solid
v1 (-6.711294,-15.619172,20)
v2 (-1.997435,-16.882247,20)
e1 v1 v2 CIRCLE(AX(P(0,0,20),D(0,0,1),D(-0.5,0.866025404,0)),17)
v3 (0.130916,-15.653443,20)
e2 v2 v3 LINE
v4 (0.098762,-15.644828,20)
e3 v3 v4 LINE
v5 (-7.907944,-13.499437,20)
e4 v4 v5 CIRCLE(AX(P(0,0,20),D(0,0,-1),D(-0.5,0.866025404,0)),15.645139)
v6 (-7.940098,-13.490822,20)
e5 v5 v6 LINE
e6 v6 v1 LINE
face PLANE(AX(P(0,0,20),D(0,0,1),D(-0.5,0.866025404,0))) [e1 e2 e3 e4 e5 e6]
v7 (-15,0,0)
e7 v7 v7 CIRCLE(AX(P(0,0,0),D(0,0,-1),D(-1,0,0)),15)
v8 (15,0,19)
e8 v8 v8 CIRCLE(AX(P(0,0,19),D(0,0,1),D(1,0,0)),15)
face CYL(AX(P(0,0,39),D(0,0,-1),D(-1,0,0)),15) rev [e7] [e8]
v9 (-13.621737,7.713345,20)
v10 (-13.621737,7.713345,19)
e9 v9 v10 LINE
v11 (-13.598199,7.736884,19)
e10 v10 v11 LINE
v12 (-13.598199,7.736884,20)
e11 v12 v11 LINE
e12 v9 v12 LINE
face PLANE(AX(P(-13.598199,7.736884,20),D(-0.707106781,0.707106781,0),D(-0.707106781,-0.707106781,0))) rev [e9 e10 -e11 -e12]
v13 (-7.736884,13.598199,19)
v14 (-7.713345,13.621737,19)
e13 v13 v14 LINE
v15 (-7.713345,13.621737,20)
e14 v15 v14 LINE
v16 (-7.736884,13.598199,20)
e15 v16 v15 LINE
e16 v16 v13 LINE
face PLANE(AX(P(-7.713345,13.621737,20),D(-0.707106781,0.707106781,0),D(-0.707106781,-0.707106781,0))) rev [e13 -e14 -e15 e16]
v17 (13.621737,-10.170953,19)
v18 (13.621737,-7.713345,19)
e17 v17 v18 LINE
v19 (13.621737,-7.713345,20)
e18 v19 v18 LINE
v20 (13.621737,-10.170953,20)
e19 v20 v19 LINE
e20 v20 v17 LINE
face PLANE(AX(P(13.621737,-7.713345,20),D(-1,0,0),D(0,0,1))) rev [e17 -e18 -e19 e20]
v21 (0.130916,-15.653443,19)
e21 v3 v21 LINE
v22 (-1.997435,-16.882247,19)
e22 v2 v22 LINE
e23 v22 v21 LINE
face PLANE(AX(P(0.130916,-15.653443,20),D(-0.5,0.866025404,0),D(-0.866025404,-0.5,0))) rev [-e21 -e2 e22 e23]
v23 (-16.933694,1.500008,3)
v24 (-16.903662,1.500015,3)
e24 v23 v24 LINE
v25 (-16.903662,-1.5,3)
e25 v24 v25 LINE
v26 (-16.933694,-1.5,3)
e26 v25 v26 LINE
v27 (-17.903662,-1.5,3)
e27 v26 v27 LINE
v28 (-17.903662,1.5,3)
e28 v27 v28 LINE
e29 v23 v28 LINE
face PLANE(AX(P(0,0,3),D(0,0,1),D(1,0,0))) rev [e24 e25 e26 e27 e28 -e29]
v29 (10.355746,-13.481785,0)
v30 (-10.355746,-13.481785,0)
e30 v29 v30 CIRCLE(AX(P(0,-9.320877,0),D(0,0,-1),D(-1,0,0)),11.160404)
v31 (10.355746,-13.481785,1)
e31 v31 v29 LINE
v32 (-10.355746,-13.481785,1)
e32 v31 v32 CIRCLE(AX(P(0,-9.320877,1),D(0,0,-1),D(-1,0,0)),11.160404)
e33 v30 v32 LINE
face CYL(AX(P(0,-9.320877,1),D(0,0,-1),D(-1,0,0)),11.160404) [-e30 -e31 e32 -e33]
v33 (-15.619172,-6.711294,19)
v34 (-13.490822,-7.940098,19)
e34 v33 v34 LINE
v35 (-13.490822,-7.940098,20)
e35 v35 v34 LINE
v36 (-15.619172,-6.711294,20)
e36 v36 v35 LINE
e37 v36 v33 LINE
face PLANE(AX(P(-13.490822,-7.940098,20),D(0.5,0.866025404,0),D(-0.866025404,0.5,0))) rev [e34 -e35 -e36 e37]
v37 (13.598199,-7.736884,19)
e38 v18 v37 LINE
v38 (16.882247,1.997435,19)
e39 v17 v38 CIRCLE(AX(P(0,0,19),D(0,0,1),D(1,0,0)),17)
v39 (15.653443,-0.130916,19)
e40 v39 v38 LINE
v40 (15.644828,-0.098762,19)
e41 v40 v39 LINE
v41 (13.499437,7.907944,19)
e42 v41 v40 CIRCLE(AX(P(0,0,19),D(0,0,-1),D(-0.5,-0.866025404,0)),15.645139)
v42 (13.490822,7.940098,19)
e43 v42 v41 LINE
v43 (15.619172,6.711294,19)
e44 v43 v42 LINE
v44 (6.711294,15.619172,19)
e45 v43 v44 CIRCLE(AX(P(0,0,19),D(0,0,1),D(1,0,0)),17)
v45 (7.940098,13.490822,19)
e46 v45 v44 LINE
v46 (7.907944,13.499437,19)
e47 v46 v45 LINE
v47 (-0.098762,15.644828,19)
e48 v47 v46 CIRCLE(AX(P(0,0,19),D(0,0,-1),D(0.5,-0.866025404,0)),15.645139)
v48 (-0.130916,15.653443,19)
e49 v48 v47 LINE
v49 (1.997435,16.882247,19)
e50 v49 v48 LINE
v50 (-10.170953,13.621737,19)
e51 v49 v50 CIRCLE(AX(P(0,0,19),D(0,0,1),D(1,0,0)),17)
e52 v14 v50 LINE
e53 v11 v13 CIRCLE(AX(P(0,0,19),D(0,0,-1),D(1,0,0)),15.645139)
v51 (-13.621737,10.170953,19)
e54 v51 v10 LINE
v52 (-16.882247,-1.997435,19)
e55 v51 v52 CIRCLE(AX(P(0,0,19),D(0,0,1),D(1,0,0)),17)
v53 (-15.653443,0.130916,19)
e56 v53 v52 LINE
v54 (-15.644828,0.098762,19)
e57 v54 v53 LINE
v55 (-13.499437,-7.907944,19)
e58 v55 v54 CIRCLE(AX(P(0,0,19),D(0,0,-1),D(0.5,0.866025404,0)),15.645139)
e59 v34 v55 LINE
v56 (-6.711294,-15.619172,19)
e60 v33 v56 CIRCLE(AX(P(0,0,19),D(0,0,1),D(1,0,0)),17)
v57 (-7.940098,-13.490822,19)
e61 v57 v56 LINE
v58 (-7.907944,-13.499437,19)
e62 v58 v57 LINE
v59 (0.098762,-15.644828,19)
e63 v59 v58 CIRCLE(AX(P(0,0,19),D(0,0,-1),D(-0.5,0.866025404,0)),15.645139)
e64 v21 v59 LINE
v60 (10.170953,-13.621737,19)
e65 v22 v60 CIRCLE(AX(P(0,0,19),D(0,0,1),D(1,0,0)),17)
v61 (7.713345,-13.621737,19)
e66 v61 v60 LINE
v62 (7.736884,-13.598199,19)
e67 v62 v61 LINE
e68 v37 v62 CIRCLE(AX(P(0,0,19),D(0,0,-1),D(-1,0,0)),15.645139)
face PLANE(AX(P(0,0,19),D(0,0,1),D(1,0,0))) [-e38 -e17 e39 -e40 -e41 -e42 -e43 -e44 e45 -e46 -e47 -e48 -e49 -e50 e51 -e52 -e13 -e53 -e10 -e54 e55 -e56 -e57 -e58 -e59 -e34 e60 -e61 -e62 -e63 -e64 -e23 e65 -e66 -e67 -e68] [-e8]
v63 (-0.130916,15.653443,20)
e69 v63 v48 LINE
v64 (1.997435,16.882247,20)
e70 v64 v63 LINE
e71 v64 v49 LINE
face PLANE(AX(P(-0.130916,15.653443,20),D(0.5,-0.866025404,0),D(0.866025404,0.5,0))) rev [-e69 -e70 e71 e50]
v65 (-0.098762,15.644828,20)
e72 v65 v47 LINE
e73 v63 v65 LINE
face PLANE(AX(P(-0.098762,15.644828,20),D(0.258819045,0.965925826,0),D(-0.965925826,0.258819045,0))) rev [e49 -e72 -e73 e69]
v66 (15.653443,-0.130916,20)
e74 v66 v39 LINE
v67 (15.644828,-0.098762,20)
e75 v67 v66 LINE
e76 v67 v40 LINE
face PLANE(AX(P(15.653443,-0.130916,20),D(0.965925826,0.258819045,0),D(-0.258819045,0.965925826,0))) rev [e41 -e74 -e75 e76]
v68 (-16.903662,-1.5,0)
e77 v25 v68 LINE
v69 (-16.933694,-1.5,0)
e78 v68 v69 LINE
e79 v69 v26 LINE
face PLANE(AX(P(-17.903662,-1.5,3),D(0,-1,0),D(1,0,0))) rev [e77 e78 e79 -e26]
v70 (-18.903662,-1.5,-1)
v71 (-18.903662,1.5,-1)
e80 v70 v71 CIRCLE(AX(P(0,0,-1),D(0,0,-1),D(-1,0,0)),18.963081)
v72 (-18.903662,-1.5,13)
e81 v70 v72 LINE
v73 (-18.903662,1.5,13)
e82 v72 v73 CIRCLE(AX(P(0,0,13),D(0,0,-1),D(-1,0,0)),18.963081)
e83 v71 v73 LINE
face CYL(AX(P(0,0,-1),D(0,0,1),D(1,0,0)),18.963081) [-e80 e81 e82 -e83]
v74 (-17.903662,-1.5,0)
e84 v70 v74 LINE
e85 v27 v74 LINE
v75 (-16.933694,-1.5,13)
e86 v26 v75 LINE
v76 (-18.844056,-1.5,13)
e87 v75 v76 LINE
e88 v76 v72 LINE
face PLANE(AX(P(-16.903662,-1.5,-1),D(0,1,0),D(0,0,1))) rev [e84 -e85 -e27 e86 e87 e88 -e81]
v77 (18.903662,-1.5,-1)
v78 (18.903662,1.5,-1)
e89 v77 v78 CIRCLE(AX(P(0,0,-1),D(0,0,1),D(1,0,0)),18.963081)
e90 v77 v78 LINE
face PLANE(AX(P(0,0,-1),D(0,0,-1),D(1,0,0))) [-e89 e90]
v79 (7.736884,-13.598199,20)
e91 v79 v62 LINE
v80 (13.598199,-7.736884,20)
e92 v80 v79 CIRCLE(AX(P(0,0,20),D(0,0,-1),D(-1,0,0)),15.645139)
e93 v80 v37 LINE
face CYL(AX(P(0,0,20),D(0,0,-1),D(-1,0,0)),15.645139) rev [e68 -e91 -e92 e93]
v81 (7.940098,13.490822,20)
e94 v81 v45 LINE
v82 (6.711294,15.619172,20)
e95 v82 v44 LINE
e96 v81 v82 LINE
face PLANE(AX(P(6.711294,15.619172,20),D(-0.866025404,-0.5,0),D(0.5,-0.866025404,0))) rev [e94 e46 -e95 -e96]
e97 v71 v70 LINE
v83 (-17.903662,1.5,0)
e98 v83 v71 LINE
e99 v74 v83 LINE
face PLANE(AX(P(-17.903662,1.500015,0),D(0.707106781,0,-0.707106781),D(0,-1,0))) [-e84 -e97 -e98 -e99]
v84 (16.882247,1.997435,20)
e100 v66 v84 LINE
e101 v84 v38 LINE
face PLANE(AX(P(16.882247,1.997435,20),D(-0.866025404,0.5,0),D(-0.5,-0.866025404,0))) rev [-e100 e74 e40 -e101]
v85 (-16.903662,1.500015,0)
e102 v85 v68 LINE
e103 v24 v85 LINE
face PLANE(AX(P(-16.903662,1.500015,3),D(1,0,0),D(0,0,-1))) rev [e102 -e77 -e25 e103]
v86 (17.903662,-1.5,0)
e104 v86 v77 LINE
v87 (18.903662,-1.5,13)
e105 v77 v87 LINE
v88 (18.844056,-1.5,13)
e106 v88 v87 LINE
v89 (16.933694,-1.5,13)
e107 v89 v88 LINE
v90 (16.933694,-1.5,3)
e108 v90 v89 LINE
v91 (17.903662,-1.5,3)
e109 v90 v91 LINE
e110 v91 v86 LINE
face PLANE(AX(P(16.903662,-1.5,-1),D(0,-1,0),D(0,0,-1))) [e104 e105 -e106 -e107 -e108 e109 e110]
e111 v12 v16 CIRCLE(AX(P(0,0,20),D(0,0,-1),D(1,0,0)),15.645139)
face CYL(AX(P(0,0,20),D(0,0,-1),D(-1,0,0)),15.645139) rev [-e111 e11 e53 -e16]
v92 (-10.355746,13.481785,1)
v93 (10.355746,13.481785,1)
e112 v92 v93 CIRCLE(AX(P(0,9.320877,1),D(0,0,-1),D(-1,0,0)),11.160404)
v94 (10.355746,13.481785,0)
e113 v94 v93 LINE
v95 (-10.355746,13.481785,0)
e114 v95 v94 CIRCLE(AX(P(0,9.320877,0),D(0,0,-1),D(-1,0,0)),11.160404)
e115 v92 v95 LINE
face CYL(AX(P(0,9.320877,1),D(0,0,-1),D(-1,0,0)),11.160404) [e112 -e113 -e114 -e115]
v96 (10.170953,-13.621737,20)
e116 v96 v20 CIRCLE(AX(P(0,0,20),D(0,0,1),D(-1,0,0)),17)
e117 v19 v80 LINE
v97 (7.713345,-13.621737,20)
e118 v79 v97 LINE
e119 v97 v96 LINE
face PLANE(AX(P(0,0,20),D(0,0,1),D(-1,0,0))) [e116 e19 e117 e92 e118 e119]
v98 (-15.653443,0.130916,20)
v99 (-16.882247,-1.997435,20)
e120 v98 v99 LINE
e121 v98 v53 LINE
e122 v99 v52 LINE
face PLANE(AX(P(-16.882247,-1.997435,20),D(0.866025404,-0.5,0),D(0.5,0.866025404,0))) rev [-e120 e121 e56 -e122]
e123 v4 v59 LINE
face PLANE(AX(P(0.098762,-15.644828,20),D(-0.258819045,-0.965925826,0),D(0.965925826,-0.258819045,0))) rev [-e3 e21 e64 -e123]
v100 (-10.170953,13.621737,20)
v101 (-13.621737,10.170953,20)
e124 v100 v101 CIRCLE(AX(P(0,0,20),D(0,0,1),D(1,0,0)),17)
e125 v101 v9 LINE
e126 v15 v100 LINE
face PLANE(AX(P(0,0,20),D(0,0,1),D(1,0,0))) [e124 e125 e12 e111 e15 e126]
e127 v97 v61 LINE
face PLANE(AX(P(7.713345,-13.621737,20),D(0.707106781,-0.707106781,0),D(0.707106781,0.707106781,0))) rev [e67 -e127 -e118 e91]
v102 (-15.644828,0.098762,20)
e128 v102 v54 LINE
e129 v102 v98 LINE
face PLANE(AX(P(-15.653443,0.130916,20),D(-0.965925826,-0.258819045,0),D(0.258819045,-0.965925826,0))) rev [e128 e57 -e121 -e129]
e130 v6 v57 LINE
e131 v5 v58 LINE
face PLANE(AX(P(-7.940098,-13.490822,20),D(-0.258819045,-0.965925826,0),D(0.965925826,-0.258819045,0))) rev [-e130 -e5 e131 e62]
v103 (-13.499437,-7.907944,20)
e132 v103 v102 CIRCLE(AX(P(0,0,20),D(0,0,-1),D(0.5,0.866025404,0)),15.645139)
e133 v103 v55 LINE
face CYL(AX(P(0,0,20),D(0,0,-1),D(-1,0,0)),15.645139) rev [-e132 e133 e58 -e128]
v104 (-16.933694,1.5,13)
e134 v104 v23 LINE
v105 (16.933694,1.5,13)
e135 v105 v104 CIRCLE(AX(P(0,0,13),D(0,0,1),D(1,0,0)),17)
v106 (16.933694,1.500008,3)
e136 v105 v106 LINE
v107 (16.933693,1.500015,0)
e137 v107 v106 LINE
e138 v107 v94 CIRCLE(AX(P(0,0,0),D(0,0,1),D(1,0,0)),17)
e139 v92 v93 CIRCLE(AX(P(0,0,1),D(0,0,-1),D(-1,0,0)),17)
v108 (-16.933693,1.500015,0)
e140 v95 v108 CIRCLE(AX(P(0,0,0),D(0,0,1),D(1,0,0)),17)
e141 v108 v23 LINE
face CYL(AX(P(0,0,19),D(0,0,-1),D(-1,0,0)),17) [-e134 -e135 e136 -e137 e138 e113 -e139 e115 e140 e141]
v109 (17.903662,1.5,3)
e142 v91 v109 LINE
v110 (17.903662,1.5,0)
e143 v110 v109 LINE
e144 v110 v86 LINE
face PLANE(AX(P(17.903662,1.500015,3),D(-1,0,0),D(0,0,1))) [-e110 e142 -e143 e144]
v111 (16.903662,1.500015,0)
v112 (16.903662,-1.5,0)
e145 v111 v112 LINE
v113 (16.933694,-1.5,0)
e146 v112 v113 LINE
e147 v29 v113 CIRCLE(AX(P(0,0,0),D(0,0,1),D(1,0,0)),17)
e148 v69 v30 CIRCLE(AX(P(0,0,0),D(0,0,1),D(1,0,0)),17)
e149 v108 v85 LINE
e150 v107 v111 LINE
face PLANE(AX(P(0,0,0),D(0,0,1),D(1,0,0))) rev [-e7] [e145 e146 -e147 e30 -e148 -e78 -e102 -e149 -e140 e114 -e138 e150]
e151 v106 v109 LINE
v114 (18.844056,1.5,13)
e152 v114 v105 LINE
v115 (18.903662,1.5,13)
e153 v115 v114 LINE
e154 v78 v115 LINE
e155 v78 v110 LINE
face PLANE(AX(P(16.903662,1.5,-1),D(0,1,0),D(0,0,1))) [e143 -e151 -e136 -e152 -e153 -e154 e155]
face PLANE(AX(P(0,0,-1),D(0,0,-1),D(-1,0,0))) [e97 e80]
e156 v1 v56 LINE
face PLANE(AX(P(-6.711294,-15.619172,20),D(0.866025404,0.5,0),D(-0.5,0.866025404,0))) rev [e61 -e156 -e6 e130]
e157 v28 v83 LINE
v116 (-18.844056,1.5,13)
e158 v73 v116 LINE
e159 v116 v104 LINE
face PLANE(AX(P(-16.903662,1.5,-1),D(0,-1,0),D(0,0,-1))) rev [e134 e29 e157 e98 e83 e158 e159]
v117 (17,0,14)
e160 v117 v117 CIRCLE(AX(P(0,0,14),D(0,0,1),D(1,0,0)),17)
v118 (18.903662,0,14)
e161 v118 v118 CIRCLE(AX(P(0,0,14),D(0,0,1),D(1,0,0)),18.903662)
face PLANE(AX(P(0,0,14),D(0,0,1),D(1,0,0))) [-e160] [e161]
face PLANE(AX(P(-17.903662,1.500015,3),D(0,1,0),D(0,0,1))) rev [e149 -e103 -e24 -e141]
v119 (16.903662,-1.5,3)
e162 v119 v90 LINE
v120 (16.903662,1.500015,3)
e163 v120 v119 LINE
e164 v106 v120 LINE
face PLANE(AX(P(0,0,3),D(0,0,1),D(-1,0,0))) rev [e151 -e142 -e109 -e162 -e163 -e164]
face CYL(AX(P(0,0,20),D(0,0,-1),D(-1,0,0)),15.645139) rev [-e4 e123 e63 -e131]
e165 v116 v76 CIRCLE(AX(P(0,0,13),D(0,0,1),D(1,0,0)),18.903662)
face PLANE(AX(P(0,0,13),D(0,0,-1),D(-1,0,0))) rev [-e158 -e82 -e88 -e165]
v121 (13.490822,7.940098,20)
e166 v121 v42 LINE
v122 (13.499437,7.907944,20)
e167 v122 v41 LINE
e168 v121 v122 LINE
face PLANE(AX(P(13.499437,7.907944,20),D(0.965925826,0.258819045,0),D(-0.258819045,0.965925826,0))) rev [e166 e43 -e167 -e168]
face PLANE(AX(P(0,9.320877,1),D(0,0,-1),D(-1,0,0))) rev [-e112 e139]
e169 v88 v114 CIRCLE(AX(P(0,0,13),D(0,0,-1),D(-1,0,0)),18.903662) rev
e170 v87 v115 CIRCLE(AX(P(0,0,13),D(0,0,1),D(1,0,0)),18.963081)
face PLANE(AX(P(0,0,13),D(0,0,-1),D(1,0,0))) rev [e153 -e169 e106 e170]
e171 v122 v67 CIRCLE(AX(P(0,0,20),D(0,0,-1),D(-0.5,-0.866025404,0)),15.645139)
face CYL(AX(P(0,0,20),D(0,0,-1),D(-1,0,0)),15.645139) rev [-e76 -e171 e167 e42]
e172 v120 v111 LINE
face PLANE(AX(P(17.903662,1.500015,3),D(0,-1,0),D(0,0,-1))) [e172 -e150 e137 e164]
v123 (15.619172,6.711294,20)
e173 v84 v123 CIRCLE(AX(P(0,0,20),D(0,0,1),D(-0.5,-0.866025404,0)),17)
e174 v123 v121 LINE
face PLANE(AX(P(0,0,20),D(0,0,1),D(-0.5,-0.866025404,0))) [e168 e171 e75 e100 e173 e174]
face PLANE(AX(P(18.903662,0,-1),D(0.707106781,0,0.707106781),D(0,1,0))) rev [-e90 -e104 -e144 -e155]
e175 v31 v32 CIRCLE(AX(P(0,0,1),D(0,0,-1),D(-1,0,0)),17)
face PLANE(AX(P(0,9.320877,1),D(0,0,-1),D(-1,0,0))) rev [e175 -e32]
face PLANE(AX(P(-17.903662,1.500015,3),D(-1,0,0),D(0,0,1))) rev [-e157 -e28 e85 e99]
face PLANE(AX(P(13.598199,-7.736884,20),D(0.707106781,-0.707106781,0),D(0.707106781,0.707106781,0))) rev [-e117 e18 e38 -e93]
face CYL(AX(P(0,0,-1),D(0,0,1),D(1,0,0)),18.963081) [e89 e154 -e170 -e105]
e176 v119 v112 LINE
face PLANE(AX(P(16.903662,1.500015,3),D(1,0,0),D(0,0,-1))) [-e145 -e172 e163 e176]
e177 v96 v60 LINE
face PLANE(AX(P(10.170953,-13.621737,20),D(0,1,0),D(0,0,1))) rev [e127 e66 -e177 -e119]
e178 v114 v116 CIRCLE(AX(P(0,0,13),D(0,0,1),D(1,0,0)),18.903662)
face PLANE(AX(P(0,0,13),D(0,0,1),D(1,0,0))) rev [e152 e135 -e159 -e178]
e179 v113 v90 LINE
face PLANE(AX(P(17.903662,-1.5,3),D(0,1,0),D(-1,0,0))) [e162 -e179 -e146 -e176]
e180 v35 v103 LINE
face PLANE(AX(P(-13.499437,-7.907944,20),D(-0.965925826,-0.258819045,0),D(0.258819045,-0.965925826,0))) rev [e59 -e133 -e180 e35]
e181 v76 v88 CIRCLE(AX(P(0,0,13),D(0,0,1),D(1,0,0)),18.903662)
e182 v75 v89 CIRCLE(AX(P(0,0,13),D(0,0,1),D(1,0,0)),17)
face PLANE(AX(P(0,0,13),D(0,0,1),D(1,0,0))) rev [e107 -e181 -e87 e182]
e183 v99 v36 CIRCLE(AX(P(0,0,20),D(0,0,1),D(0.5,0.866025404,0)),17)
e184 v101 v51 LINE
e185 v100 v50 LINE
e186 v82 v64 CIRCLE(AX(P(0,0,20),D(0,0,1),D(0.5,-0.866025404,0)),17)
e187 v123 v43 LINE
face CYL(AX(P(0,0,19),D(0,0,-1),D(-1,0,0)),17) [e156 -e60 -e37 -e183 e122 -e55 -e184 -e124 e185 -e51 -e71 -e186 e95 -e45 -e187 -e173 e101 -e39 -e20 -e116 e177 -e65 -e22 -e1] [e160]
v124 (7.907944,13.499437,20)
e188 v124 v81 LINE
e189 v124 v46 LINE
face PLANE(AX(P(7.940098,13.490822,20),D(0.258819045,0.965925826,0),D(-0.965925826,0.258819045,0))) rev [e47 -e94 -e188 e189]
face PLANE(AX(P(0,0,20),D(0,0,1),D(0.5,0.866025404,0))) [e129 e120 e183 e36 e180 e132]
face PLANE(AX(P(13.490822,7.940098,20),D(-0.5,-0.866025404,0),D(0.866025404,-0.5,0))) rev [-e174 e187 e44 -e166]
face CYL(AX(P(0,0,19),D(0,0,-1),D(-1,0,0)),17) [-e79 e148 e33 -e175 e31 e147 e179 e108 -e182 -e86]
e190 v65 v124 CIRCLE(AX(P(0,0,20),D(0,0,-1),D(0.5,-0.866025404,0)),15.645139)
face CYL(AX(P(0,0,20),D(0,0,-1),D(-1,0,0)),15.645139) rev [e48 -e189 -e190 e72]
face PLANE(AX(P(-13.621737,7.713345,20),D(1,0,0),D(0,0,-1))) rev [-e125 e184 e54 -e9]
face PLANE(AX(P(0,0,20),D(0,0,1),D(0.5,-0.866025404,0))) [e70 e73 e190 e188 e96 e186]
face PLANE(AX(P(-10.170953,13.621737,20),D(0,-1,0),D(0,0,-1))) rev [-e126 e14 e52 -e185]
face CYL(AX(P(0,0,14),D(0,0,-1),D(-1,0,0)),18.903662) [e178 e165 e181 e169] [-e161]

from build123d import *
from OCP.BRepAlgoAPI import BRepAlgoAPI_Cut
from OCP.TopTools import TopTools_ListOfShape
from build123d.topology import SkipClean

# Parameters (mm, degrees)
SKETCH1_R           = 17
BOSS_EXTRUDE1_DEPTH = 19
BOSS_EXTRUDE3_DEPTH = 1
CIRPATTERN1_COUNT   = 6
BOSS_EXTRUDE4_START = -13
BOSS_EXTRUDE4_DEPTH = 14
CUT_EXTRUDE3_START  = -4
CUT_EXTRUDE3_DEPTH  = 4
CHAMFER1_SIZE       = 1
MIRROR1_START       = -1
MIRROR1_DEPTH       = 4
MIRROR1_START_2     = 3
MIRROR1_2_DEPTH     = 10
MIRROR1_3_DEPTH     = 3
MIRROR1_4_DEPTH     = 10
MIRROR1_5_DEPTH     = 1
MIRROR1_START_3     = 11.973929824
MIRROR1_6_OUTLINE_W = 2.659800733000001
MIRROR1_6_OUTLINE_H = 4.5
MIRROR1_6_DEPTH     = 2.142099975
SKETCH7_R           = 18.903661893109657
BOSS_EXTRUDE5_DEPTH = 1
BOSS_EXTRUDE7_DEPTH = 1
SKETCH2_R           = 15.000000000000002
CUT_EXTRUDE5_DEPTH  = 39


with BuildPart() as part:
    # Sketch1 → Boss-Extrude1 (new body)
    with BuildSketch(Plane.XY):
        Circle(SKETCH1_R)
    extrude(amount=BOSS_EXTRUDE1_DEPTH)

    # Sketch4 → Boss-Extrude3 (add)
    with SkipClean():  # the faces are left unmerged after this step: merging them gives an invalid solid
        with BuildSketch(Plane.XY.offset(19)):
            with BuildLine():
                Line((-10.170952539104004, 13.621737203723095), (-7.713345385435483, 13.621737203723095))
                Line((-7.713345385435483, 13.621737203723095), (-7.736883673253982, 13.598198915904591))
                ThreePointArc((-7.736883673253982, 13.598198915904591), (-11.062784069346495, 11.062784069346478), (-13.598198915904605, 7.736883673253956))
                Line((-13.598198915904605, 7.736883673253956), (-13.621737203723118, 7.7133453854354475))
                Line((-13.621737203723118, 7.7133453854354475), (-13.621737203723118, 10.17095253910397))
                ThreePointArc((-13.621737203723118, 10.17095253910397), (-12.020815280171325, 12.020815280171297), (-10.170952539104004, 13.621737203723095))
            make_face()
        boss_extrude3 = extrude(amount=BOSS_EXTRUDE3_DEPTH)

    # CirPattern1: Boss-Extrude3 ×6 about axis
    with SkipClean():  # the faces are left unmerged after this step: merging them gives an invalid solid
        cirpattern1_axis = Axis((-2.8e-16, 1e-17, 0), (0, 0, 1))
        for i in range(1, CIRPATTERN1_COUNT):
            add(boss_extrude3.rotate(cirpattern1_axis, i * 360 / CIRPATTERN1_COUNT))

    # Sketch5 → Boss-Extrude4 (add)
    with SkipClean():  # the faces are left unmerged after this step: merging them gives an invalid solid
        with BuildSketch(Plane(origin=(0, 0, 0), x_dir=(-1, 0, 0), z_dir=(0, 0, -1)).offset(BOSS_EXTRUDE4_START)):
            with BuildLine():
                Line((16.903661893109657, 1.5), (18.903661893109657, 1.5))
                ThreePointArc((18.903661893109657, 1.5), (18.963080787915402, 0), (18.903661893109657, -1.5))
                Line((18.903661893109657, -1.5), (16.903661893109657, -1.5))
                Line((16.903661893109657, -1.5), (16.903661893109657, 1.5))
            make_face()
        extrude(amount=BOSS_EXTRUDE4_DEPTH)


with BuildPart() as cut_extrude3_tool:
    # Cut-Extrude3: read off the stored shape, not the designer's step
    # Cut-Extrude3 outline → Cut-Extrude3 (new body)
    with BuildSketch(Plane(origin=(0, 0, -1), x_dir=(-1, 0, 0), z_dir=(0, 0, -1)).offset(CUT_EXTRUDE3_START)):
        Polygon((17.903661893, 1.5), (16.903661893, 1.500007564), (16.903661893, -1.5), (17.903661893, -1.5), align=None)
    extrude(amount=CUT_EXTRUDE3_DEPTH)


with BuildPart() as part_1:
    add(part.part)

    # Cut-Extrude3: cut by cut_extrude3_tool, with a tolerance
    cut_extrude3_stock = TopTools_ListOfShape()
    cut_extrude3_stock.Append(part_1.part.wrapped)
    cut_extrude3_tools = TopTools_ListOfShape()
    cut_extrude3_tools.Append(cut_extrude3_tool.part.wrapped)
    cut_extrude3_cut = BRepAlgoAPI_Cut()
    cut_extrude3_cut.SetArguments(cut_extrude3_stock)
    cut_extrude3_cut.SetTools(cut_extrude3_tools)
    cut_extrude3_cut.SetFuzzyValue(0.00001)
    cut_extrude3_cut.Build()
    add(Compound.cast(cut_extrude3_cut.Shape()).solids(), mode=Mode.REPLACE)

    # Chamfer1
    chamfer1_edges = [part_1.edges().sort_by_distance(p)[0] for p in [
        (-17.903661893, 0, -1),
    ]]
    chamfer(chamfer1_edges, length=CHAMFER1_SIZE)


with BuildPart() as mirror1_tool:
    # Mirror1: read off the stored shape, not the designer's step
    # Mirror1 outline → Mirror1 (new body)
    with BuildSketch(Plane.XY.offset(MIRROR1_START)):
        Polygon((16.903661893, -1.5), (17.903661893, -1.5), (17.903661893, 1.5), (16.933693552, 1.5), (16.903661893, 1.500015127), align=None)
    extrude(amount=MIRROR1_DEPTH)


with BuildPart() as part_2:
    add(part_1.part)

    # Mirror1: cut by mirror1_tool, with a tolerance
    mirror1_stock = TopTools_ListOfShape()
    mirror1_stock.Append(part_2.part.wrapped)
    mirror1_tools = TopTools_ListOfShape()
    mirror1_tools.Append(mirror1_tool.part.wrapped)
    mirror1_cut = BRepAlgoAPI_Cut()
    mirror1_cut.SetArguments(mirror1_stock)
    mirror1_cut.SetTools(mirror1_tools)
    mirror1_cut.SetFuzzyValue(0.00001)
    mirror1_cut.Build()
    add(Compound.cast(mirror1_cut.Shape()).solids(), mode=Mode.REPLACE)


with BuildPart() as mirror1_2_tool:
    # Mirror1 2 outline → Mirror1 2 (new body)
    with SkipClean():  # the faces are left unmerged after this step: merging them gives an invalid solid
        with BuildSketch(Plane.XY.offset(MIRROR1_START_2)):
            Polygon((16.903661893, -1.5), (17.903661893, -1.5), (17.903661893, 1.5), (16.933693552, 1.5), (16.903661893, 1.500015127), align=None)
            with BuildLine():
                Line((17.903661893, 1.5), (17.903661893, -1.5))
                Line((17.903661893, -1.5), (18.903661893, -1.5))
                ThreePointArc((18.903661893, -1.5), (18.963080788, 0), (18.903661893, 1.5))
                Line((18.903661893, 1.5), (17.903661893, 1.5))
            make_face()
        extrude(amount=MIRROR1_2_DEPTH)


with BuildPart() as part_3:
    with SkipClean():  # the faces are left unmerged after this step: merging them gives an invalid solid
        add(part_2.part)


with BuildPart() as part_4:
    # Mirror1 2: joined with mirror1_2_tool
    with SkipClean():  # the faces are left unmerged after this step: merging them gives an invalid solid
        add(part_3.part.fuse(mirror1_2_tool.part, tol=0.00001))


with BuildPart() as mirror1_3_tool:
    # Mirror1 3 outline → Mirror1 3 (new body)
    with SkipClean():  # the faces are left unmerged after this step: merging them gives an invalid solid
        with BuildSketch(Plane.XY):
            with BuildLine():
                Line((17.903661893, 1.5), (17.903661893, -1.5))
                Line((17.903661893, -1.5), (18.903661893, -1.5))
                ThreePointArc((18.903661893, -1.5), (18.963080788, 0), (18.903661893, 1.5))
                Line((18.903661893, 1.5), (17.903661893, 1.5))
            make_face()
        extrude(amount=MIRROR1_3_DEPTH)


with BuildPart() as part_5:
    with SkipClean():  # the faces are left unmerged after this step: merging them gives an invalid solid
        add(part_4.part)


with BuildPart() as part_6:
    # Mirror1 3: joined with mirror1_3_tool
    with SkipClean():  # the faces are left unmerged after this step: merging them gives an invalid solid
        add(part_5.part.fuse(mirror1_3_tool.part, tol=0.00001))


with BuildPart() as mirror1_4_tool:
    # Mirror1 4 outline → Mirror1 4 (new body)
    with SkipClean():  # the faces are left unmerged after this step: merging them gives an invalid solid
        with BuildSketch(Plane.XY.offset(MIRROR1_START_2)):
            with BuildLine():
                ThreePointArc((16.933693952, 1.500003049), (17, 1.53e-06), (16.933694222, -1.5))
                Line((16.933694222, -1.5), (18.903661893, -1.5))
                ThreePointArc((18.903661893, -1.5), (18.963080788, 0), (18.903661893, 1.5))
                Line((18.903661893, 1.5), (16.933693952, 1.500003049))
            make_face()
        extrude(amount=MIRROR1_4_DEPTH)


with BuildPart() as part_7:
    with SkipClean():  # the faces are left unmerged after this step: merging them gives an invalid solid
        add(part_6.part)


with BuildPart() as part_8:
    # Mirror1 4: joined with mirror1_4_tool
    with SkipClean():  # the faces are left unmerged after this step: merging them gives an invalid solid
        add(part_7.part.fuse(mirror1_4_tool.part, tol=0.00001))


with BuildPart() as mirror1_5_tool:
    # Mirror1 5 outline → Mirror1 5 (new body)
    with SkipClean():  # the faces are left unmerged after this step: merging them gives an invalid solid
        with BuildSketch(Plane.XY.offset(MIRROR1_START)):
            with BuildLine():
                ThreePointArc((16.933693952, 1.500003049), (17, 1.53e-06), (16.933694222, -1.5))
                Line((16.933694222, -1.5), (18.903661893, -1.5))
                ThreePointArc((18.903661893, -1.5), (18.963080788, 0), (18.903661893, 1.5))
                Line((18.903661893, 1.5), (16.933693952, 1.500003049))
            make_face()
        extrude(amount=MIRROR1_5_DEPTH)


with BuildPart() as part_9:
    with SkipClean():  # the faces are left unmerged after this step: merging them gives an invalid solid
        add(part_8.part)


with BuildPart() as part_10:
    # Mirror1 5: joined with mirror1_5_tool
    with SkipClean():  # the faces are left unmerged after this step: merging them gives an invalid solid
        add(part_9.part.fuse(mirror1_5_tool.part, tol=0.00001))


with BuildPart() as mirror1_6_tool:
    # Mirror1 6 outline → Mirror1 6 (new body)
    with BuildSketch(Plane(origin=(0, 0, 0), x_dir=(0.707106781186545, 0, 0.70710678118655), z_dir=(0.70710678118655, 0, -0.707106781186545)).offset(MIRROR1_START_3)):
        with Locations((11.3299003665, 0.75)):
            Rectangle(MIRROR1_6_OUTLINE_W, MIRROR1_6_OUTLINE_H)
    extrude(amount=MIRROR1_6_DEPTH)


with BuildPart() as part_11:
    add(part_10.part)

    # Mirror1 6: cut by mirror1_6_tool, with a tolerance
    mirror1_6_stock = TopTools_ListOfShape()
    mirror1_6_stock.Append(part_11.part.wrapped)
    mirror1_6_tools = TopTools_ListOfShape()
    mirror1_6_tools.Append(mirror1_6_tool.part.wrapped)
    mirror1_6_cut = BRepAlgoAPI_Cut()
    mirror1_6_cut.SetArguments(mirror1_6_stock)
    mirror1_6_cut.SetTools(mirror1_6_tools)
    mirror1_6_cut.SetFuzzyValue(0.00001)
    mirror1_6_cut.Build()
    add(Compound.cast(mirror1_6_cut.Shape()).solids(), mode=Mode.REPLACE)

    # Sketch7 → Boss-Extrude5 (add)
    with SkipClean():  # the faces are left unmerged after this step: merging them gives an invalid solid
        with BuildSketch(Plane.XY.offset(13)):
            with Locations(Location((0, 0, 0), (0, 0, 175.448812236))):
                Circle(SKETCH7_R)
        extrude(amount=BOSS_EXTRUDE5_DEPTH)

    # Sketch11 → Boss-Extrude7 (add)
    with SkipClean():  # the faces are left unmerged after this step: merging them gives an invalid solid
        with BuildSketch(Plane(origin=(0, 0, 0), x_dir=(-1, 0, 0), z_dir=(0, 0, -1))):
            with BuildLine():
                Line((11.160404315577848, 9.320876818848085), (11.160404315577848, -9.320876818848085))
                ThreePointArc((11.160404315577848, -9.320876818848085), (-2.05e-15, -20.481281134425934), (-11.160404315577848, -9.320876818848085))
                Line((-11.160404315577848, -9.320876818848085), (-11.160404315577848, 9.320876818848085))
                ThreePointArc((-11.160404315577848, 9.320876818848085), (6.8e-16, 20.481281134425934), (11.160404315577848, 9.320876818848085))
            make_face()
        extrude(amount=-BOSS_EXTRUDE7_DEPTH)

    # Sketch2 → Cut-Extrude5 (cut)
    with SkipClean():  # the faces are left unmerged after this step: merging them gives an invalid solid
        with BuildSketch(Plane(origin=(0, 0, 0), x_dir=(-1, 0, 0), z_dir=(0, 0, -1))):
            Circle(SKETCH2_R)
        extrude(amount=-CUT_EXTRUDE5_DEPTH, mode=Mode.SUBTRACT)


solid = part_11.part
